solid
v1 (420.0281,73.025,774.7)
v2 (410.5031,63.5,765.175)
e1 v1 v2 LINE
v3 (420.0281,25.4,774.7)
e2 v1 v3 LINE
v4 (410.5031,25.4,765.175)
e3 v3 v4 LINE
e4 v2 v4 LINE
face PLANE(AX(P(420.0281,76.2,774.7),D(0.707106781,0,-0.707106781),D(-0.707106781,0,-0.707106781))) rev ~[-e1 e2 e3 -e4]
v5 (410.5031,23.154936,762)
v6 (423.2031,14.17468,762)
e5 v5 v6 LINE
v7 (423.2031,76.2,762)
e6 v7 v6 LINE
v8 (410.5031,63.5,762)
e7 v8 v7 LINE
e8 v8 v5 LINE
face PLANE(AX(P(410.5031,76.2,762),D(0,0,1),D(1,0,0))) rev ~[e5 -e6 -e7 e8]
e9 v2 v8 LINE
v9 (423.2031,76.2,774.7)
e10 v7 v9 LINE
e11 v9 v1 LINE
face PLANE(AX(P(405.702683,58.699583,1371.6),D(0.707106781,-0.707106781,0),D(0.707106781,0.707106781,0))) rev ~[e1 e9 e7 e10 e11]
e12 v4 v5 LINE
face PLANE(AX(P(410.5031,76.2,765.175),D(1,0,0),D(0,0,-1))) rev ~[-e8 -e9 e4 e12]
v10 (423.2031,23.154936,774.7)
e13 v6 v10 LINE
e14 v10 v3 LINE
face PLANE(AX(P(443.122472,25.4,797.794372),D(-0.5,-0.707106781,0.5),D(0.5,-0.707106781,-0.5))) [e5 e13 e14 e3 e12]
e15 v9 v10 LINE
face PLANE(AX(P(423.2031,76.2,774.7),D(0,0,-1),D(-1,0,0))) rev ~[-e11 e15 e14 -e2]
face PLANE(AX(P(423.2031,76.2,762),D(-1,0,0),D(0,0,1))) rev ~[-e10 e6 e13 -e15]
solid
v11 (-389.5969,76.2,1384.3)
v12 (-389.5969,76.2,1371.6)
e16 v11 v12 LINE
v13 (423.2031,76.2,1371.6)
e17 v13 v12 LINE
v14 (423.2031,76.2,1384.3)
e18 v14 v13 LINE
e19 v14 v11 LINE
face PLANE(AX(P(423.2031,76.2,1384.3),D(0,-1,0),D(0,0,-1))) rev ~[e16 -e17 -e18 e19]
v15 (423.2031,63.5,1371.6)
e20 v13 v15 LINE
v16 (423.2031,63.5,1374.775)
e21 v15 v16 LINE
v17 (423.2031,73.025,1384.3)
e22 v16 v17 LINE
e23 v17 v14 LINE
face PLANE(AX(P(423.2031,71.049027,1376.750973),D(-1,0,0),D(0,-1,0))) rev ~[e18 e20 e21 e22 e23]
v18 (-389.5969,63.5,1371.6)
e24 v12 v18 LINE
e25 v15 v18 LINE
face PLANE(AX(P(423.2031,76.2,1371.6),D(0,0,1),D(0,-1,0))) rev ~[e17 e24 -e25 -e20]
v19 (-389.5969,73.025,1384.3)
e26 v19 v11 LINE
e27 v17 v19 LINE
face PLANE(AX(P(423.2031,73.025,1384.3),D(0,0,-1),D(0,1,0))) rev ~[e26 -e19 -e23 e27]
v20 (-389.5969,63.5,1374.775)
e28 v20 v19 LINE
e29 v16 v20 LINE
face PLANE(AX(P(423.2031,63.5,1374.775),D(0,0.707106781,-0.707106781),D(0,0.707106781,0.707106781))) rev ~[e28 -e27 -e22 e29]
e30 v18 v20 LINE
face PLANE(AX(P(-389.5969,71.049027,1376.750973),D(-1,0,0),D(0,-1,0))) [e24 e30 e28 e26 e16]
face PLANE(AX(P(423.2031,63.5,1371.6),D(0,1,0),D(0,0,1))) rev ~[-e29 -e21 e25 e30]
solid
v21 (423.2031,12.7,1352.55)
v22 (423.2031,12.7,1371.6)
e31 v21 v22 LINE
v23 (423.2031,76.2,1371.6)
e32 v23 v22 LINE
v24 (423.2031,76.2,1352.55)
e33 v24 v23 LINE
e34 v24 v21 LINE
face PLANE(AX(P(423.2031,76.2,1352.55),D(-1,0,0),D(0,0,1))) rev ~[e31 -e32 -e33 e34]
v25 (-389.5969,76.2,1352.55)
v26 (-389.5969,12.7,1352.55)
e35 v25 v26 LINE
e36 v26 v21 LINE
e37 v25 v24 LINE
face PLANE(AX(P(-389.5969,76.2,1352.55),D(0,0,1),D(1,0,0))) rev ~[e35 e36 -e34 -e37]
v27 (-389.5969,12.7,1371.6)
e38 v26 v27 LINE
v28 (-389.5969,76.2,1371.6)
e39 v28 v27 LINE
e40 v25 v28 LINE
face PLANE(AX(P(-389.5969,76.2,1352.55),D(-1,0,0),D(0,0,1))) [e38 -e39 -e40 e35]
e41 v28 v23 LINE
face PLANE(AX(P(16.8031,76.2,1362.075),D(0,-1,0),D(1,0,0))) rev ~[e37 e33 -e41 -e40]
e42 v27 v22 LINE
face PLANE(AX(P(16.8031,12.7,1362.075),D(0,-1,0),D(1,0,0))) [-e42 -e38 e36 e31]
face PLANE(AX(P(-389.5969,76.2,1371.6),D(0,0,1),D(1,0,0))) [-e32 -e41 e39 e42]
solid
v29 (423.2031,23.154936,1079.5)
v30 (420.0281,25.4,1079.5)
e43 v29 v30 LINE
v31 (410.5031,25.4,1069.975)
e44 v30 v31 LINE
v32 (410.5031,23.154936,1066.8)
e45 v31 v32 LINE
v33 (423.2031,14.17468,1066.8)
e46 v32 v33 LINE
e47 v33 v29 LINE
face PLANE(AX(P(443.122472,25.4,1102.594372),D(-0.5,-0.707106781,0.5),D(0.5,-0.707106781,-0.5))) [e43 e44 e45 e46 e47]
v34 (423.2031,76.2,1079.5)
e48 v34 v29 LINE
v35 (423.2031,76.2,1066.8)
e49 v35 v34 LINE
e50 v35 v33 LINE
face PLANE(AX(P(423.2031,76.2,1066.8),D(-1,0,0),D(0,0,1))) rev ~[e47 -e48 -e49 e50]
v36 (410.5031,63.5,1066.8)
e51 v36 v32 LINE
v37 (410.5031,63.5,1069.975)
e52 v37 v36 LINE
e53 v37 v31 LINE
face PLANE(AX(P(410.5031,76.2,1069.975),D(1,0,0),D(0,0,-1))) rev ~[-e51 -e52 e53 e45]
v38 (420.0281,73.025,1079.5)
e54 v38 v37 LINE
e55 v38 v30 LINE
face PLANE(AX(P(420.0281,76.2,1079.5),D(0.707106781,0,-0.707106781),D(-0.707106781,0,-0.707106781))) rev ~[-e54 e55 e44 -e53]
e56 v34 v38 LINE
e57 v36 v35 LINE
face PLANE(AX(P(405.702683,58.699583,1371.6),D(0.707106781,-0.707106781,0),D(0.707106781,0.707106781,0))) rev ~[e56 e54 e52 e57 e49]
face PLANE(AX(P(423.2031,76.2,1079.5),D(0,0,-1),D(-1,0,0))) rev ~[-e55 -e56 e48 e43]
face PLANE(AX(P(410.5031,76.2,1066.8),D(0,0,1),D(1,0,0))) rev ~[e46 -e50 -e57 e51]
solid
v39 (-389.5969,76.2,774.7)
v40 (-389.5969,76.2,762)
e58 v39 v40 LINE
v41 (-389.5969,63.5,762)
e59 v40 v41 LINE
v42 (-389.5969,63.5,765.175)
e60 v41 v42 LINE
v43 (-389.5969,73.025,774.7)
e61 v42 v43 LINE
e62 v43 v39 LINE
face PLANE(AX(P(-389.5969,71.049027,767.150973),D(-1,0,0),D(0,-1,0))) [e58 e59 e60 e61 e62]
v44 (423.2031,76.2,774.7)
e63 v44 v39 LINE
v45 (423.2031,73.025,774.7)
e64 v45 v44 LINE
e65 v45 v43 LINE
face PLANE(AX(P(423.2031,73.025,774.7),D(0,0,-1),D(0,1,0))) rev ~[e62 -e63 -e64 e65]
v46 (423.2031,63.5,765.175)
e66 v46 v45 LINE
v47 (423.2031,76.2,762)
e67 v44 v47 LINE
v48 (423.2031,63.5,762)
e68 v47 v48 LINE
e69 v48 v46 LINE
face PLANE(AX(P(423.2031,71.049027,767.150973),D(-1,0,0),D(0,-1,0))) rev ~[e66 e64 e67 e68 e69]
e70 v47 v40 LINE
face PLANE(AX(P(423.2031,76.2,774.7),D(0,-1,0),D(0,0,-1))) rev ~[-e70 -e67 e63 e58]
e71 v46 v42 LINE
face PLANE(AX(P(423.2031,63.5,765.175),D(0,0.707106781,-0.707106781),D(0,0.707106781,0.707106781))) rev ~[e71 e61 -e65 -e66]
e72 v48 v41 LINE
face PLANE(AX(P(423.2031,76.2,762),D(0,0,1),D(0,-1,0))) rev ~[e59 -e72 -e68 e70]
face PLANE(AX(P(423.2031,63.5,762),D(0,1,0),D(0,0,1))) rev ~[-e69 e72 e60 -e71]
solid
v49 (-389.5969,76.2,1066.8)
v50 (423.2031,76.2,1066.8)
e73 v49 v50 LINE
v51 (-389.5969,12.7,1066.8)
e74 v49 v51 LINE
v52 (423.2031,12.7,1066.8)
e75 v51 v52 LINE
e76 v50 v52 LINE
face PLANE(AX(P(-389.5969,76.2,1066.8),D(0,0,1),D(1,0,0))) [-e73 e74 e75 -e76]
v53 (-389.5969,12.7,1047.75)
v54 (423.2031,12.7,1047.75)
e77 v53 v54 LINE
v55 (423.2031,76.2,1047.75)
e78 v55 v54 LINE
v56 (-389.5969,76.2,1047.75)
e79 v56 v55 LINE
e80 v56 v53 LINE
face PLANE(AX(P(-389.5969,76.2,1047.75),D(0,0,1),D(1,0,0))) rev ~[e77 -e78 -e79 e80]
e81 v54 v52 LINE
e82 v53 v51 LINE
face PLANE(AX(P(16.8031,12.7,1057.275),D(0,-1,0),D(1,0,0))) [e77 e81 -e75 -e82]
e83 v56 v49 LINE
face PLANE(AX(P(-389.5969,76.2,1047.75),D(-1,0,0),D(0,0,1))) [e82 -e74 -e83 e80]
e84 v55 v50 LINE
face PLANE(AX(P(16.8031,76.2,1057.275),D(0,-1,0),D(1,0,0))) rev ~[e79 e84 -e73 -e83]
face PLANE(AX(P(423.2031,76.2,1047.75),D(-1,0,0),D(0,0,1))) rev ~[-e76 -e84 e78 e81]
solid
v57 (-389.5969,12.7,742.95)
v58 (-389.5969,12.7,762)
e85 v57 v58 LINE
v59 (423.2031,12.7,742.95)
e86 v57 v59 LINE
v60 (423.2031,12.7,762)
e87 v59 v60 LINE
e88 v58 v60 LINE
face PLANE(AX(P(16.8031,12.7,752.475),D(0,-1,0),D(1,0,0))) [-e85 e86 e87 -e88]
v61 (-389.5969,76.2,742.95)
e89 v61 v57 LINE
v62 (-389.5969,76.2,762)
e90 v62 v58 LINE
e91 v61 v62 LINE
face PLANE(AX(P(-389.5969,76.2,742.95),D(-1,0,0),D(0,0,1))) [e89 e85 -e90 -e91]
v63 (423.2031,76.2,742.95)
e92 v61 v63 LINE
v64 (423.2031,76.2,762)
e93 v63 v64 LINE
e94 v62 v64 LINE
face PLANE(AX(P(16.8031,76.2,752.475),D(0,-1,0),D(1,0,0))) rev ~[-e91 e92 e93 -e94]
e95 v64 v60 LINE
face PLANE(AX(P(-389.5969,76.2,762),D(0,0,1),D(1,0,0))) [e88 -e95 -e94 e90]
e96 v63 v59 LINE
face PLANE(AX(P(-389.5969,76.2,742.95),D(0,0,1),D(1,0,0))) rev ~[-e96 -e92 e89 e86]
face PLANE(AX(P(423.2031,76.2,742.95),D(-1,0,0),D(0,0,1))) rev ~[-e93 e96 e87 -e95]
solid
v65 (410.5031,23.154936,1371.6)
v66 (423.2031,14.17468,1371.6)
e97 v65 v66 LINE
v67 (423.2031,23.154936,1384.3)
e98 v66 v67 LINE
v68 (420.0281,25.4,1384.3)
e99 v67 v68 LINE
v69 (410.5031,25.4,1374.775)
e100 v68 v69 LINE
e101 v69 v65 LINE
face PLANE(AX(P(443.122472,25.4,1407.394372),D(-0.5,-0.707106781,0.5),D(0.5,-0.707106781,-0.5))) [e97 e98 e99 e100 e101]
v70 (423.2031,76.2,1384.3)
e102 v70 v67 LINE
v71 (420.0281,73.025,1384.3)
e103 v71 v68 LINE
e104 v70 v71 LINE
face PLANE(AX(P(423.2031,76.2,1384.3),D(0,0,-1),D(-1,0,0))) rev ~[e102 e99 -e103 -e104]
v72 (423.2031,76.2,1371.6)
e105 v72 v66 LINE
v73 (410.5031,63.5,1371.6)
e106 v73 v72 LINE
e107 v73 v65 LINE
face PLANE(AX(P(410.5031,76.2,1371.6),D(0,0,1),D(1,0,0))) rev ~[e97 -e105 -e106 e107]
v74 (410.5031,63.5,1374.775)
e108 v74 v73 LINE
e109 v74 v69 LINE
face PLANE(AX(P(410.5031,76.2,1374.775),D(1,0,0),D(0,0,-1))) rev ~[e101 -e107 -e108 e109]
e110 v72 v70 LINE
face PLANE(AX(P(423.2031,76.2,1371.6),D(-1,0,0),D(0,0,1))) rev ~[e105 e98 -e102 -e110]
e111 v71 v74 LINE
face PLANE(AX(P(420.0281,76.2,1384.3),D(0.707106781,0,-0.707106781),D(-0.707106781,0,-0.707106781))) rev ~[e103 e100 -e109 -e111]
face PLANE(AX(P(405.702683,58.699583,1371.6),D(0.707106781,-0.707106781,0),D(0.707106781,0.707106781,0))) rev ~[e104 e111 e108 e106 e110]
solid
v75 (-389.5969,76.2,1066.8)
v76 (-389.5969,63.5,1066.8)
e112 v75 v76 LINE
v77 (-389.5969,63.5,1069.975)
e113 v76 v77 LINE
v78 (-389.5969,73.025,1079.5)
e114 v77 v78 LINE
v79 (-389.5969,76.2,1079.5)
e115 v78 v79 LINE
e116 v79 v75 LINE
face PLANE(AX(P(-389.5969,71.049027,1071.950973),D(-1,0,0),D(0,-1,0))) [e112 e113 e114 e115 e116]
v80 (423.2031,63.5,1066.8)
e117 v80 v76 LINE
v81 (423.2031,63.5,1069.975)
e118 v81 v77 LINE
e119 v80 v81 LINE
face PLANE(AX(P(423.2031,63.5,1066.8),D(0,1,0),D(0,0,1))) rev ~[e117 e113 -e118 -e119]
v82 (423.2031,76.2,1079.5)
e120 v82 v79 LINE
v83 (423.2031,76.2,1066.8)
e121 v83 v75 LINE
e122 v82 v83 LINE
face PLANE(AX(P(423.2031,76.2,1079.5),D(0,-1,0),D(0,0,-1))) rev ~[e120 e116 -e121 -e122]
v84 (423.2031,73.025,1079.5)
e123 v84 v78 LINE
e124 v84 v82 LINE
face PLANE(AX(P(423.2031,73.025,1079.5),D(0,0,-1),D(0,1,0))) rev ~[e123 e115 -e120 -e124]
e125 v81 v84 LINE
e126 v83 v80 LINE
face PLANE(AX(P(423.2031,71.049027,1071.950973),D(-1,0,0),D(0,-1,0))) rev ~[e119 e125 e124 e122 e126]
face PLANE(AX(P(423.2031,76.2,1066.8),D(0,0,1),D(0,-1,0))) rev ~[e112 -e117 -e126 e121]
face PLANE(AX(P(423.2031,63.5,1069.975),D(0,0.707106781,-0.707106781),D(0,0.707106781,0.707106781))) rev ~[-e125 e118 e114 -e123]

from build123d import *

# Parameters (mm, degrees)
F2_W          = 812.8
F2_H          = 19.05
F3_DEPTH      = 63.5
F5_DEPTH      = 63.5
F6_T1_DEPTH   = 78.7911320759
F6_2_T1_DEPTH = 78.7911320759
F6_3_T1_DEPTH = 78.7911320759
F8_DEPTH      = 25.4
F8_DEPTH_BACK = 762
F10_DEPTH     = 812.8


# Not quite as in the source:
# - a fillet or chamfer that OpenCascade refuses, or shapes differently, is made with other operations: its cross-section is extruded or revolved along the edge and cut away or added


with BuildPart() as f3:
    # F2 (on face) → F3 (new body)
    with BuildSketch(Plane.XZ.offset(-76.2)):
        with Locations((16.8031001225, 1362.075)):
            Rectangle(F2_W, F2_H)
    extrude(amount=F3_DEPTH)


with BuildPart() as f3b:
    # F2 (on face) → F3, piece 2 (new body)
    with BuildSketch(Plane.XZ.offset(-76.2)):
        with Locations((16.8031001225, 1057.275)):
            Rectangle(F2_W, F2_H)
    extrude(amount=F3_DEPTH)


with BuildPart() as f3c:
    # F2 (on face) → F3, piece 3 (new body)
    with BuildSketch(Plane.XZ.offset(-76.2)):
        with Locations((16.8031001225, 752.475)):
            Rectangle(F2_W, F2_H)
    extrude(amount=F3_DEPTH)


with BuildPart() as f5:
    # F4 (on face) → F5 (new body)
    with BuildSketch(Plane.XZ.offset(-76.2)):
        Polygon((410.5031001225, 1371.6), (423.2031001225, 1371.6), (423.2031001225, 1384.3), (420.0281001225, 1384.3), (410.5031001225, 1374.775), align=None)
    extrude(amount=F5_DEPTH)

    # F6: chamfer of 12.7 on 1 edges, made by hand

    # F6_s2 → F6_t1 (cut)
    with BuildSketch(Plane(origin=(925.2584219554, 0, 925.2584219554), x_dir=(0, 1, 0), z_dir=(-0.7071067812, 0, -0.7071067812))):
        Polygon((25.4, -681.843199311), (12.7, -669.143199311), (12.7, -681.843199311), align=None)
    extrude(amount=F6_T1_DEPTH, mode=Mode.SUBTRACT)


with BuildPart() as f5b:
    # F4 (on face) → F5, piece 2 (new body)
    with BuildSketch(Plane.XZ.offset(-76.2)):
        Polygon((410.5031001225, 1066.8), (423.2031001225, 1066.8), (423.2031001225, 1079.5), (420.0281001225, 1079.5), (410.5031001225, 1069.975), align=None)
    extrude(amount=F5_DEPTH)

    # F6#2: chamfer of 12.7 on 1 edges, made by hand

    # F6_2_s2 → F6_2_t1 (cut)
    with BuildSketch(Plane(origin=(772.8584219554, 0, 772.8584219554), x_dir=(0, 1, 0), z_dir=(-0.7071067812, 0, -0.7071067812))):
        Polygon((25.4, -466.3170524054), (12.7, -453.6170524054), (12.7, -466.3170524054), align=None)
    extrude(amount=F6_2_T1_DEPTH, mode=Mode.SUBTRACT)


with BuildPart() as f5c:
    # F4 (on face) → F5, piece 3 (new body)
    with BuildSketch(Plane.XZ.offset(-76.2)):
        Polygon((410.5031001225, 762), (423.2031001225, 762), (423.2031001225, 774.7), (420.0281001225, 774.7), (410.5031001225, 765.175), align=None)
    extrude(amount=F5_DEPTH)

    # F6#3: chamfer of 12.7 on 1 edges, made by hand

    # F6_3_s2 → F6_3_t1 (cut)
    with BuildSketch(Plane(origin=(620.4584219554, 0, 620.4584219554), x_dir=(0, 1, 0), z_dir=(-0.7071067812, 0, -0.7071067812))):
        Polygon((25.4, -250.7909054997), (12.7, -238.0909054997), (12.7, -250.7909054997), align=None)
    extrude(amount=F6_3_T1_DEPTH, mode=Mode.SUBTRACT)


with BuildPart() as f8_tool:
    # F7 (on face) → F8 (new body, two sides)
    with BuildSketch(Plane.XY.offset(1371.6)) as f8_sk:
        Polygon((405.7026830367, 58.6995829142), (423.2031001225, 76.2), (423.2031001225, 80.5244233704), (405.7026830367, 80.5244233704), align=None)
    extrude(amount=F8_DEPTH)
    extrude(f8_sk.sketch, amount=-F8_DEPTH_BACK)


with BuildPart() as f5_1:
    add(f5.part)

    # F8: cut by f8_tool
    add(f8_tool.part, mode=Mode.SUBTRACT)


with BuildPart() as f5b_1:
    add(f5b.part)

    # F8: cut by f8_tool
    add(f8_tool.part, mode=Mode.SUBTRACT)


with BuildPart() as f5c_1:
    add(f5c.part)

    # F8: cut by f8_tool
    add(f8_tool.part, mode=Mode.SUBTRACT)


with BuildPart() as f10:
    # F9 (on face) → F10 (new body)
    with BuildSketch(Plane(origin=(423.2031001225, 0, 0), x_dir=(0, -1, 0), z_dir=(-1, 0, 0))):
        Polygon((-76.2, 1384.3), (-76.2, 1371.6), (-63.5, 1371.6), (-63.5, 1374.775), (-73.025, 1384.3), align=None)
    extrude(amount=F10_DEPTH)


with BuildPart() as f10b:
    # F9 (on face) → F10, piece 2 (new body)
    with BuildSketch(Plane(origin=(423.2031001225, 0, 0), x_dir=(0, -1, 0), z_dir=(-1, 0, 0))):
        Polygon((-76.2, 1079.5), (-76.2, 1066.8), (-63.5, 1066.8), (-63.5, 1069.975), (-73.025, 1079.5), align=None)
    extrude(amount=F10_DEPTH)


with BuildPart() as f10c:
    # F9 (on face) → F10, piece 3 (new body)
    with BuildSketch(Plane(origin=(423.2031001225, 0, 0), x_dir=(0, -1, 0), z_dir=(-1, 0, 0))):
        Polygon((-76.2, 774.7), (-76.2, 762), (-63.5, 762), (-63.5, 765.175), (-73.025, 774.7), align=None)
    extrude(amount=F10_DEPTH)


solid = Compound([f3.part, f3b.part, f3c.part, f5_1.part, f5b_1.part, f5c_1.part, f10.part, f10b.part, f10c.part])
